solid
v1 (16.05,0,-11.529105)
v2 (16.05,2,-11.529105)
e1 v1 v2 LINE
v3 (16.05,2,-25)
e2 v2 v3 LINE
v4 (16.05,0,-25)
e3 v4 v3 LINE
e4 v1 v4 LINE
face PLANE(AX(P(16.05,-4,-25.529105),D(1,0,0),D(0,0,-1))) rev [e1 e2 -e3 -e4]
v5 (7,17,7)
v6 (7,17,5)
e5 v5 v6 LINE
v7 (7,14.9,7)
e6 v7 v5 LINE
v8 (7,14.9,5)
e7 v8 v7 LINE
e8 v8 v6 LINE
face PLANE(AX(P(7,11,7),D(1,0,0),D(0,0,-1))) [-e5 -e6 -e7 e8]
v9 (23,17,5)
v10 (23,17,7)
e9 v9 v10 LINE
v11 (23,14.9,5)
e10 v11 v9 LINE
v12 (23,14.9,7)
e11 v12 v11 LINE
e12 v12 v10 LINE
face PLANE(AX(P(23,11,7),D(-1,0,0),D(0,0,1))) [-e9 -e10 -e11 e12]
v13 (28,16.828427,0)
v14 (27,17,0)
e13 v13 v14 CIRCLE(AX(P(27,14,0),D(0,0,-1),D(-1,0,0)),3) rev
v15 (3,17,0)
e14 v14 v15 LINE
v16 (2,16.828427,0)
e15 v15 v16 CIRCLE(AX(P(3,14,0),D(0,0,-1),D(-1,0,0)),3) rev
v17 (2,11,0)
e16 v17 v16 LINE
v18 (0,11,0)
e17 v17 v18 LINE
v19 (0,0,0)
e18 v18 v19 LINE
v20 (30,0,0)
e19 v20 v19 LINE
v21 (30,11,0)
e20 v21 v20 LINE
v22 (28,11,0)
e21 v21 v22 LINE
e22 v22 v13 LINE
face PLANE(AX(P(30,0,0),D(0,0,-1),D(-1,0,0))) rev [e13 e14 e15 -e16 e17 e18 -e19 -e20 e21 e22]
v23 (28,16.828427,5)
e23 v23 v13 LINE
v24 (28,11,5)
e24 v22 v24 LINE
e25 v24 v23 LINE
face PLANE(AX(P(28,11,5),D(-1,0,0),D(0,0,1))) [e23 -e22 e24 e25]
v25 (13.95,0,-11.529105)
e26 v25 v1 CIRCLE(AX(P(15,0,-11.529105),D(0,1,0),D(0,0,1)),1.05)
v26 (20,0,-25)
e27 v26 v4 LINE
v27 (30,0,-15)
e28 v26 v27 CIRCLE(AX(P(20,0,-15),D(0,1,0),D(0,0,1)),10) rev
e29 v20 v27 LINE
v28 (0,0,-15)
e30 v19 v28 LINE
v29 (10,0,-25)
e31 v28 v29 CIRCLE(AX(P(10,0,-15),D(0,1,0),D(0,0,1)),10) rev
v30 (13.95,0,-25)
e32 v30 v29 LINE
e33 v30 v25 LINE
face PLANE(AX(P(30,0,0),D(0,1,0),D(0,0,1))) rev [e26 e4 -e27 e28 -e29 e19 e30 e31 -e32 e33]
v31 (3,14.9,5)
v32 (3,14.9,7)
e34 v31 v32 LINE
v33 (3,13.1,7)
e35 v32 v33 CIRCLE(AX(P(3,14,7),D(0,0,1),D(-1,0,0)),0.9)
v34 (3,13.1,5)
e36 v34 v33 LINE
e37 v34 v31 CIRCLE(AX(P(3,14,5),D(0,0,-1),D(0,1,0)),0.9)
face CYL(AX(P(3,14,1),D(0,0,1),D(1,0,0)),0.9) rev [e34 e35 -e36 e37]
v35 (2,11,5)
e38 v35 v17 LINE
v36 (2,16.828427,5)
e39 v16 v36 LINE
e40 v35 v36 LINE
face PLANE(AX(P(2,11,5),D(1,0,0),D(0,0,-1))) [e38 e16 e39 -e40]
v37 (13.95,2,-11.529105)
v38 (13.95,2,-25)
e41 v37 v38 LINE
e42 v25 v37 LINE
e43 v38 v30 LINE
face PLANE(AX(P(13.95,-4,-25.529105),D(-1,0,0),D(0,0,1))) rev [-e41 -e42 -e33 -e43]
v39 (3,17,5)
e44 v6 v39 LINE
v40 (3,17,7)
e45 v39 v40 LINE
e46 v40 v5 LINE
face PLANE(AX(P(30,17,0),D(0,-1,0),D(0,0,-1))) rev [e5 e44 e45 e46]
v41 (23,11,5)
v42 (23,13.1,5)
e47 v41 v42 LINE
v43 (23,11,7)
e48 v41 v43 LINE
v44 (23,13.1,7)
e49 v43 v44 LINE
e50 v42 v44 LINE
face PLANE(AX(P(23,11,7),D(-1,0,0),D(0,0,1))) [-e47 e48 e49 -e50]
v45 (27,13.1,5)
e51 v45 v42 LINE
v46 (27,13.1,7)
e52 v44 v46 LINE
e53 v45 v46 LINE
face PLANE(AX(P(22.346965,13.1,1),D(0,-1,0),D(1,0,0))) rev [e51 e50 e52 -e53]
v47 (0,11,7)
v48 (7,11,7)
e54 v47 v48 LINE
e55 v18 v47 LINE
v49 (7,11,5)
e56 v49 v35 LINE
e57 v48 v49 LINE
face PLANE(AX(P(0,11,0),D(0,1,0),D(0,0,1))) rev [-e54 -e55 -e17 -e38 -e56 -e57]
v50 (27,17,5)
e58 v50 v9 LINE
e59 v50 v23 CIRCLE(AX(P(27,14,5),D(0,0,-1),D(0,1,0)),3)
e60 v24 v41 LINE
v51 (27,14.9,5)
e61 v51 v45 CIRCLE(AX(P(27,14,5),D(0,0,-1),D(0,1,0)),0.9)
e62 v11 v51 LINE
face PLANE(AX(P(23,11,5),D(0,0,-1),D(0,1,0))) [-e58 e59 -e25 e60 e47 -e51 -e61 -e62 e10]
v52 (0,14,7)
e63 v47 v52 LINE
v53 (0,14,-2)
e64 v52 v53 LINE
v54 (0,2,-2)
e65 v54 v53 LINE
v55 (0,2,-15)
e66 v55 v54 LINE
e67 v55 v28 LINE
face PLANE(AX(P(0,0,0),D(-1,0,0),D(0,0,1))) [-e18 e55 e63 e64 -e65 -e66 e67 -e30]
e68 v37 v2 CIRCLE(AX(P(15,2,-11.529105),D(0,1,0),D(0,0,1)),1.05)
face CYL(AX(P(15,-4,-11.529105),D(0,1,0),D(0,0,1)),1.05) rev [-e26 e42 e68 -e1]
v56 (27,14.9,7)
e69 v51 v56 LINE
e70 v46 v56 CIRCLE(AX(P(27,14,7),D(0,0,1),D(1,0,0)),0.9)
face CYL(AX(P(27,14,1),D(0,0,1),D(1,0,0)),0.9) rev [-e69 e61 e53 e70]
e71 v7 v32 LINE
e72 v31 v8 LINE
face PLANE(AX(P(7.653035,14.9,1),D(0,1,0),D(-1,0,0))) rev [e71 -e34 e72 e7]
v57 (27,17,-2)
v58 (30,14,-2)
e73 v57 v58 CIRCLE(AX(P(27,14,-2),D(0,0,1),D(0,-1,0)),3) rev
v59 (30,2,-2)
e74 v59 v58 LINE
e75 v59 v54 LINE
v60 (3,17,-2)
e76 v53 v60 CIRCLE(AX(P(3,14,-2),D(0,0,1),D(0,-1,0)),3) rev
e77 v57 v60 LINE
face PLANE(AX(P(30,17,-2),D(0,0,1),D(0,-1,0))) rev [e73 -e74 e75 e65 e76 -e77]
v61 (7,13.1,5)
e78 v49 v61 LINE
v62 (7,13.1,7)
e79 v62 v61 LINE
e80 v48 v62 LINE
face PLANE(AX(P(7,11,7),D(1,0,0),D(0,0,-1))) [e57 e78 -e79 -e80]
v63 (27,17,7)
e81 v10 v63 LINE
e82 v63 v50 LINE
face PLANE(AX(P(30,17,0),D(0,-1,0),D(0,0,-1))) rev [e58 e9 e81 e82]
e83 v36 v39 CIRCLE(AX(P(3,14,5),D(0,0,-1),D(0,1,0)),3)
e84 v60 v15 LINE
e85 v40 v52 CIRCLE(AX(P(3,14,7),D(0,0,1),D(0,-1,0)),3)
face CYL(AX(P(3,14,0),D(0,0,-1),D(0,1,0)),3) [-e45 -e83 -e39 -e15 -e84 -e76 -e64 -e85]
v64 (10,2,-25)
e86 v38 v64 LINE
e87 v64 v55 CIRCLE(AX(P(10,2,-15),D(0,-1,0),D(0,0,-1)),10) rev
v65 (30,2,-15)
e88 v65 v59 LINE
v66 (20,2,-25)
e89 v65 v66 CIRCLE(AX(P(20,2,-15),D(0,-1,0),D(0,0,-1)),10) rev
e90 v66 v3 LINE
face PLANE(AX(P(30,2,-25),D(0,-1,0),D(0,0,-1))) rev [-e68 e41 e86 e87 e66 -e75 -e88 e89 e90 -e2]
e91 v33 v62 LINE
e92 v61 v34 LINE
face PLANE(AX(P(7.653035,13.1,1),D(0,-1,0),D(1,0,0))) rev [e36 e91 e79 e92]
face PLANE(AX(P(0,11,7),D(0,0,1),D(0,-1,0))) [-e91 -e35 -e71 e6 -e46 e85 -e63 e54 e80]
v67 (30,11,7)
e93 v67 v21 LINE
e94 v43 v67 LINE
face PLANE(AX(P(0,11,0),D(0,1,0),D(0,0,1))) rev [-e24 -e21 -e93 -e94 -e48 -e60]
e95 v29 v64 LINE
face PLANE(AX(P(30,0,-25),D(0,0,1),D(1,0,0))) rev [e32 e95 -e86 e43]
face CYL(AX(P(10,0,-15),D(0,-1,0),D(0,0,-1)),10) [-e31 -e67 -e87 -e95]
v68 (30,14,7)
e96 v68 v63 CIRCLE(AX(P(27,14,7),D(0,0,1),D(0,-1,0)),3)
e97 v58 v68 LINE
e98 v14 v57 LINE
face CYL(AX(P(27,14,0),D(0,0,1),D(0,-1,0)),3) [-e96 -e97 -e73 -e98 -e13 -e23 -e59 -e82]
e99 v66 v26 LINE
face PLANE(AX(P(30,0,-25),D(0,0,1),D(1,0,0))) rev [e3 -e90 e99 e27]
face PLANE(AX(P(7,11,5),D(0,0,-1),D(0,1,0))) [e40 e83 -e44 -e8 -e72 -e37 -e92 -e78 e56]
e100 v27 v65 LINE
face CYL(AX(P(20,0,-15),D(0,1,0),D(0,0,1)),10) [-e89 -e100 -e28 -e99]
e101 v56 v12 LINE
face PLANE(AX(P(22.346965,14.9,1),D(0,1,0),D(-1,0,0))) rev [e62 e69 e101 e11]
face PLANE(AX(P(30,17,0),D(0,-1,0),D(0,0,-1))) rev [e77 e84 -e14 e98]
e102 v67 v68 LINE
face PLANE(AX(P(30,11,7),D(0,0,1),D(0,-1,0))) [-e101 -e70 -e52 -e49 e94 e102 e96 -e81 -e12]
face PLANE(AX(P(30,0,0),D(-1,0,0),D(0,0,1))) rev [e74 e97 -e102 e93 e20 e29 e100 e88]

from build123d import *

# Parameters (mm, degrees)
EXTRUDE_1_DEPTH     = 30
EXTRUDE_2_DEPTH     = 6
CUT_EXTRUDE_1_DEPTH = 6
CUT_EXTRUDE_2_DEPTH = 6
FILLET_1_R          = 10
FILLET_2_R          = 3


with BuildPart() as part:
    # 草图1 → 凸台-拉伸1 (new body)
    with BuildSketch(Plane(origin=(0, 0, 0), x_dir=(0, 0, -1), z_dir=(1, 0, 0))):
        Polygon((0, 0), (25, 0), (25, 2), (2, 2), (2, 17), (0, 17), align=None)
    extrude(amount=EXTRUDE_1_DEPTH)

    # 草图3 → 凸台-拉伸2 (add)
    with BuildSketch(Plane(origin=(0, 17, 0), x_dir=(1, 0, 0), z_dir=(0, 1, 0))):
        Polygon((0, 0), (0, -7), (7, -7), (7, -5), (2, -5), (2, 0), align=None)
        Polygon((28, -5), (28, 0), (30, 0), (30, -7), (23, -7), (23, -5), align=None)
    extrude(amount=-EXTRUDE_2_DEPTH)

    # 草图4 → 切除-拉伸1 (cut)
    with BuildSketch(Plane.XY.offset(7)):
        with BuildLine():
            Line((22.34696537, 14.9), (27, 14.9))
            ThreePointArc((27, 14.9), (27.9, 14), (27, 13.1))
            Line((27, 13.1), (22.34696537, 13.1))
            ThreePointArc((22.34696537, 13.1), (21.44696537, 14), (22.34696537, 14.9))
        make_face()
        with BuildLine():
            Line((7.65303463, 14.9), (3, 14.9))
            ThreePointArc((3, 14.9), (2.1, 14), (3, 13.1))
            Line((3, 13.1), (7.65303463, 13.1))
            ThreePointArc((7.65303463, 13.1), (8.55303463, 14), (7.65303463, 14.9))
        make_face()
    extrude(amount=-CUT_EXTRUDE_1_DEPTH, mode=Mode.SUBTRACT)

    # 草图5 → 切除-拉伸2 (cut)
    with BuildSketch(Plane(origin=(0, 2, 0), x_dir=(1, 0, 0), z_dir=(0, 1, 0))):
        with BuildLine():
            Line((16.05, 25.529105391), (16.05, 11.529105391))
            ThreePointArc((16.05, 11.529105391), (15, 10.479105391), (13.95, 11.529105391))
            Line((13.95, 11.529105391), (13.95, 25.529105391))
            ThreePointArc((13.95, 25.529105391), (15, 26.579105391), (16.05, 25.529105391))
        make_face()
    extrude(amount=-CUT_EXTRUDE_2_DEPTH, mode=Mode.SUBTRACT)

    # 圆角1
    fillet_1_edges = [part.edges().sort_by_distance(p)[0] for p in [
        (30, 1, -25),
        (0, 1, -25),
    ]]
    fillet(fillet_1_edges, radius=FILLET_1_R)

    # 圆角2
    # the kernel refuses this fillet: 3 mm, written as the material it takes off along each edge
    with BuildSketch(Plane(origin=(30, 17, -9.5), x_dir=(0, -1, 0), z_dir=(0, 0, 1)), Plane(origin=(0, 17, 14.5), x_dir=(0, -1, 0), z_dir=(0, 0, -1))) as fillet_2_piece_1:
        with BuildLine():
            CenterArc((FILLET_2_R, -FILLET_2_R), FILLET_2_R, 90, 90)
            Line((0, -FILLET_2_R), (0, 0))
            Line((0, 0), (FILLET_2_R, 0))
        make_face()
    extrude(amount=24, mode=Mode.SUBTRACT)


solid = part.part
